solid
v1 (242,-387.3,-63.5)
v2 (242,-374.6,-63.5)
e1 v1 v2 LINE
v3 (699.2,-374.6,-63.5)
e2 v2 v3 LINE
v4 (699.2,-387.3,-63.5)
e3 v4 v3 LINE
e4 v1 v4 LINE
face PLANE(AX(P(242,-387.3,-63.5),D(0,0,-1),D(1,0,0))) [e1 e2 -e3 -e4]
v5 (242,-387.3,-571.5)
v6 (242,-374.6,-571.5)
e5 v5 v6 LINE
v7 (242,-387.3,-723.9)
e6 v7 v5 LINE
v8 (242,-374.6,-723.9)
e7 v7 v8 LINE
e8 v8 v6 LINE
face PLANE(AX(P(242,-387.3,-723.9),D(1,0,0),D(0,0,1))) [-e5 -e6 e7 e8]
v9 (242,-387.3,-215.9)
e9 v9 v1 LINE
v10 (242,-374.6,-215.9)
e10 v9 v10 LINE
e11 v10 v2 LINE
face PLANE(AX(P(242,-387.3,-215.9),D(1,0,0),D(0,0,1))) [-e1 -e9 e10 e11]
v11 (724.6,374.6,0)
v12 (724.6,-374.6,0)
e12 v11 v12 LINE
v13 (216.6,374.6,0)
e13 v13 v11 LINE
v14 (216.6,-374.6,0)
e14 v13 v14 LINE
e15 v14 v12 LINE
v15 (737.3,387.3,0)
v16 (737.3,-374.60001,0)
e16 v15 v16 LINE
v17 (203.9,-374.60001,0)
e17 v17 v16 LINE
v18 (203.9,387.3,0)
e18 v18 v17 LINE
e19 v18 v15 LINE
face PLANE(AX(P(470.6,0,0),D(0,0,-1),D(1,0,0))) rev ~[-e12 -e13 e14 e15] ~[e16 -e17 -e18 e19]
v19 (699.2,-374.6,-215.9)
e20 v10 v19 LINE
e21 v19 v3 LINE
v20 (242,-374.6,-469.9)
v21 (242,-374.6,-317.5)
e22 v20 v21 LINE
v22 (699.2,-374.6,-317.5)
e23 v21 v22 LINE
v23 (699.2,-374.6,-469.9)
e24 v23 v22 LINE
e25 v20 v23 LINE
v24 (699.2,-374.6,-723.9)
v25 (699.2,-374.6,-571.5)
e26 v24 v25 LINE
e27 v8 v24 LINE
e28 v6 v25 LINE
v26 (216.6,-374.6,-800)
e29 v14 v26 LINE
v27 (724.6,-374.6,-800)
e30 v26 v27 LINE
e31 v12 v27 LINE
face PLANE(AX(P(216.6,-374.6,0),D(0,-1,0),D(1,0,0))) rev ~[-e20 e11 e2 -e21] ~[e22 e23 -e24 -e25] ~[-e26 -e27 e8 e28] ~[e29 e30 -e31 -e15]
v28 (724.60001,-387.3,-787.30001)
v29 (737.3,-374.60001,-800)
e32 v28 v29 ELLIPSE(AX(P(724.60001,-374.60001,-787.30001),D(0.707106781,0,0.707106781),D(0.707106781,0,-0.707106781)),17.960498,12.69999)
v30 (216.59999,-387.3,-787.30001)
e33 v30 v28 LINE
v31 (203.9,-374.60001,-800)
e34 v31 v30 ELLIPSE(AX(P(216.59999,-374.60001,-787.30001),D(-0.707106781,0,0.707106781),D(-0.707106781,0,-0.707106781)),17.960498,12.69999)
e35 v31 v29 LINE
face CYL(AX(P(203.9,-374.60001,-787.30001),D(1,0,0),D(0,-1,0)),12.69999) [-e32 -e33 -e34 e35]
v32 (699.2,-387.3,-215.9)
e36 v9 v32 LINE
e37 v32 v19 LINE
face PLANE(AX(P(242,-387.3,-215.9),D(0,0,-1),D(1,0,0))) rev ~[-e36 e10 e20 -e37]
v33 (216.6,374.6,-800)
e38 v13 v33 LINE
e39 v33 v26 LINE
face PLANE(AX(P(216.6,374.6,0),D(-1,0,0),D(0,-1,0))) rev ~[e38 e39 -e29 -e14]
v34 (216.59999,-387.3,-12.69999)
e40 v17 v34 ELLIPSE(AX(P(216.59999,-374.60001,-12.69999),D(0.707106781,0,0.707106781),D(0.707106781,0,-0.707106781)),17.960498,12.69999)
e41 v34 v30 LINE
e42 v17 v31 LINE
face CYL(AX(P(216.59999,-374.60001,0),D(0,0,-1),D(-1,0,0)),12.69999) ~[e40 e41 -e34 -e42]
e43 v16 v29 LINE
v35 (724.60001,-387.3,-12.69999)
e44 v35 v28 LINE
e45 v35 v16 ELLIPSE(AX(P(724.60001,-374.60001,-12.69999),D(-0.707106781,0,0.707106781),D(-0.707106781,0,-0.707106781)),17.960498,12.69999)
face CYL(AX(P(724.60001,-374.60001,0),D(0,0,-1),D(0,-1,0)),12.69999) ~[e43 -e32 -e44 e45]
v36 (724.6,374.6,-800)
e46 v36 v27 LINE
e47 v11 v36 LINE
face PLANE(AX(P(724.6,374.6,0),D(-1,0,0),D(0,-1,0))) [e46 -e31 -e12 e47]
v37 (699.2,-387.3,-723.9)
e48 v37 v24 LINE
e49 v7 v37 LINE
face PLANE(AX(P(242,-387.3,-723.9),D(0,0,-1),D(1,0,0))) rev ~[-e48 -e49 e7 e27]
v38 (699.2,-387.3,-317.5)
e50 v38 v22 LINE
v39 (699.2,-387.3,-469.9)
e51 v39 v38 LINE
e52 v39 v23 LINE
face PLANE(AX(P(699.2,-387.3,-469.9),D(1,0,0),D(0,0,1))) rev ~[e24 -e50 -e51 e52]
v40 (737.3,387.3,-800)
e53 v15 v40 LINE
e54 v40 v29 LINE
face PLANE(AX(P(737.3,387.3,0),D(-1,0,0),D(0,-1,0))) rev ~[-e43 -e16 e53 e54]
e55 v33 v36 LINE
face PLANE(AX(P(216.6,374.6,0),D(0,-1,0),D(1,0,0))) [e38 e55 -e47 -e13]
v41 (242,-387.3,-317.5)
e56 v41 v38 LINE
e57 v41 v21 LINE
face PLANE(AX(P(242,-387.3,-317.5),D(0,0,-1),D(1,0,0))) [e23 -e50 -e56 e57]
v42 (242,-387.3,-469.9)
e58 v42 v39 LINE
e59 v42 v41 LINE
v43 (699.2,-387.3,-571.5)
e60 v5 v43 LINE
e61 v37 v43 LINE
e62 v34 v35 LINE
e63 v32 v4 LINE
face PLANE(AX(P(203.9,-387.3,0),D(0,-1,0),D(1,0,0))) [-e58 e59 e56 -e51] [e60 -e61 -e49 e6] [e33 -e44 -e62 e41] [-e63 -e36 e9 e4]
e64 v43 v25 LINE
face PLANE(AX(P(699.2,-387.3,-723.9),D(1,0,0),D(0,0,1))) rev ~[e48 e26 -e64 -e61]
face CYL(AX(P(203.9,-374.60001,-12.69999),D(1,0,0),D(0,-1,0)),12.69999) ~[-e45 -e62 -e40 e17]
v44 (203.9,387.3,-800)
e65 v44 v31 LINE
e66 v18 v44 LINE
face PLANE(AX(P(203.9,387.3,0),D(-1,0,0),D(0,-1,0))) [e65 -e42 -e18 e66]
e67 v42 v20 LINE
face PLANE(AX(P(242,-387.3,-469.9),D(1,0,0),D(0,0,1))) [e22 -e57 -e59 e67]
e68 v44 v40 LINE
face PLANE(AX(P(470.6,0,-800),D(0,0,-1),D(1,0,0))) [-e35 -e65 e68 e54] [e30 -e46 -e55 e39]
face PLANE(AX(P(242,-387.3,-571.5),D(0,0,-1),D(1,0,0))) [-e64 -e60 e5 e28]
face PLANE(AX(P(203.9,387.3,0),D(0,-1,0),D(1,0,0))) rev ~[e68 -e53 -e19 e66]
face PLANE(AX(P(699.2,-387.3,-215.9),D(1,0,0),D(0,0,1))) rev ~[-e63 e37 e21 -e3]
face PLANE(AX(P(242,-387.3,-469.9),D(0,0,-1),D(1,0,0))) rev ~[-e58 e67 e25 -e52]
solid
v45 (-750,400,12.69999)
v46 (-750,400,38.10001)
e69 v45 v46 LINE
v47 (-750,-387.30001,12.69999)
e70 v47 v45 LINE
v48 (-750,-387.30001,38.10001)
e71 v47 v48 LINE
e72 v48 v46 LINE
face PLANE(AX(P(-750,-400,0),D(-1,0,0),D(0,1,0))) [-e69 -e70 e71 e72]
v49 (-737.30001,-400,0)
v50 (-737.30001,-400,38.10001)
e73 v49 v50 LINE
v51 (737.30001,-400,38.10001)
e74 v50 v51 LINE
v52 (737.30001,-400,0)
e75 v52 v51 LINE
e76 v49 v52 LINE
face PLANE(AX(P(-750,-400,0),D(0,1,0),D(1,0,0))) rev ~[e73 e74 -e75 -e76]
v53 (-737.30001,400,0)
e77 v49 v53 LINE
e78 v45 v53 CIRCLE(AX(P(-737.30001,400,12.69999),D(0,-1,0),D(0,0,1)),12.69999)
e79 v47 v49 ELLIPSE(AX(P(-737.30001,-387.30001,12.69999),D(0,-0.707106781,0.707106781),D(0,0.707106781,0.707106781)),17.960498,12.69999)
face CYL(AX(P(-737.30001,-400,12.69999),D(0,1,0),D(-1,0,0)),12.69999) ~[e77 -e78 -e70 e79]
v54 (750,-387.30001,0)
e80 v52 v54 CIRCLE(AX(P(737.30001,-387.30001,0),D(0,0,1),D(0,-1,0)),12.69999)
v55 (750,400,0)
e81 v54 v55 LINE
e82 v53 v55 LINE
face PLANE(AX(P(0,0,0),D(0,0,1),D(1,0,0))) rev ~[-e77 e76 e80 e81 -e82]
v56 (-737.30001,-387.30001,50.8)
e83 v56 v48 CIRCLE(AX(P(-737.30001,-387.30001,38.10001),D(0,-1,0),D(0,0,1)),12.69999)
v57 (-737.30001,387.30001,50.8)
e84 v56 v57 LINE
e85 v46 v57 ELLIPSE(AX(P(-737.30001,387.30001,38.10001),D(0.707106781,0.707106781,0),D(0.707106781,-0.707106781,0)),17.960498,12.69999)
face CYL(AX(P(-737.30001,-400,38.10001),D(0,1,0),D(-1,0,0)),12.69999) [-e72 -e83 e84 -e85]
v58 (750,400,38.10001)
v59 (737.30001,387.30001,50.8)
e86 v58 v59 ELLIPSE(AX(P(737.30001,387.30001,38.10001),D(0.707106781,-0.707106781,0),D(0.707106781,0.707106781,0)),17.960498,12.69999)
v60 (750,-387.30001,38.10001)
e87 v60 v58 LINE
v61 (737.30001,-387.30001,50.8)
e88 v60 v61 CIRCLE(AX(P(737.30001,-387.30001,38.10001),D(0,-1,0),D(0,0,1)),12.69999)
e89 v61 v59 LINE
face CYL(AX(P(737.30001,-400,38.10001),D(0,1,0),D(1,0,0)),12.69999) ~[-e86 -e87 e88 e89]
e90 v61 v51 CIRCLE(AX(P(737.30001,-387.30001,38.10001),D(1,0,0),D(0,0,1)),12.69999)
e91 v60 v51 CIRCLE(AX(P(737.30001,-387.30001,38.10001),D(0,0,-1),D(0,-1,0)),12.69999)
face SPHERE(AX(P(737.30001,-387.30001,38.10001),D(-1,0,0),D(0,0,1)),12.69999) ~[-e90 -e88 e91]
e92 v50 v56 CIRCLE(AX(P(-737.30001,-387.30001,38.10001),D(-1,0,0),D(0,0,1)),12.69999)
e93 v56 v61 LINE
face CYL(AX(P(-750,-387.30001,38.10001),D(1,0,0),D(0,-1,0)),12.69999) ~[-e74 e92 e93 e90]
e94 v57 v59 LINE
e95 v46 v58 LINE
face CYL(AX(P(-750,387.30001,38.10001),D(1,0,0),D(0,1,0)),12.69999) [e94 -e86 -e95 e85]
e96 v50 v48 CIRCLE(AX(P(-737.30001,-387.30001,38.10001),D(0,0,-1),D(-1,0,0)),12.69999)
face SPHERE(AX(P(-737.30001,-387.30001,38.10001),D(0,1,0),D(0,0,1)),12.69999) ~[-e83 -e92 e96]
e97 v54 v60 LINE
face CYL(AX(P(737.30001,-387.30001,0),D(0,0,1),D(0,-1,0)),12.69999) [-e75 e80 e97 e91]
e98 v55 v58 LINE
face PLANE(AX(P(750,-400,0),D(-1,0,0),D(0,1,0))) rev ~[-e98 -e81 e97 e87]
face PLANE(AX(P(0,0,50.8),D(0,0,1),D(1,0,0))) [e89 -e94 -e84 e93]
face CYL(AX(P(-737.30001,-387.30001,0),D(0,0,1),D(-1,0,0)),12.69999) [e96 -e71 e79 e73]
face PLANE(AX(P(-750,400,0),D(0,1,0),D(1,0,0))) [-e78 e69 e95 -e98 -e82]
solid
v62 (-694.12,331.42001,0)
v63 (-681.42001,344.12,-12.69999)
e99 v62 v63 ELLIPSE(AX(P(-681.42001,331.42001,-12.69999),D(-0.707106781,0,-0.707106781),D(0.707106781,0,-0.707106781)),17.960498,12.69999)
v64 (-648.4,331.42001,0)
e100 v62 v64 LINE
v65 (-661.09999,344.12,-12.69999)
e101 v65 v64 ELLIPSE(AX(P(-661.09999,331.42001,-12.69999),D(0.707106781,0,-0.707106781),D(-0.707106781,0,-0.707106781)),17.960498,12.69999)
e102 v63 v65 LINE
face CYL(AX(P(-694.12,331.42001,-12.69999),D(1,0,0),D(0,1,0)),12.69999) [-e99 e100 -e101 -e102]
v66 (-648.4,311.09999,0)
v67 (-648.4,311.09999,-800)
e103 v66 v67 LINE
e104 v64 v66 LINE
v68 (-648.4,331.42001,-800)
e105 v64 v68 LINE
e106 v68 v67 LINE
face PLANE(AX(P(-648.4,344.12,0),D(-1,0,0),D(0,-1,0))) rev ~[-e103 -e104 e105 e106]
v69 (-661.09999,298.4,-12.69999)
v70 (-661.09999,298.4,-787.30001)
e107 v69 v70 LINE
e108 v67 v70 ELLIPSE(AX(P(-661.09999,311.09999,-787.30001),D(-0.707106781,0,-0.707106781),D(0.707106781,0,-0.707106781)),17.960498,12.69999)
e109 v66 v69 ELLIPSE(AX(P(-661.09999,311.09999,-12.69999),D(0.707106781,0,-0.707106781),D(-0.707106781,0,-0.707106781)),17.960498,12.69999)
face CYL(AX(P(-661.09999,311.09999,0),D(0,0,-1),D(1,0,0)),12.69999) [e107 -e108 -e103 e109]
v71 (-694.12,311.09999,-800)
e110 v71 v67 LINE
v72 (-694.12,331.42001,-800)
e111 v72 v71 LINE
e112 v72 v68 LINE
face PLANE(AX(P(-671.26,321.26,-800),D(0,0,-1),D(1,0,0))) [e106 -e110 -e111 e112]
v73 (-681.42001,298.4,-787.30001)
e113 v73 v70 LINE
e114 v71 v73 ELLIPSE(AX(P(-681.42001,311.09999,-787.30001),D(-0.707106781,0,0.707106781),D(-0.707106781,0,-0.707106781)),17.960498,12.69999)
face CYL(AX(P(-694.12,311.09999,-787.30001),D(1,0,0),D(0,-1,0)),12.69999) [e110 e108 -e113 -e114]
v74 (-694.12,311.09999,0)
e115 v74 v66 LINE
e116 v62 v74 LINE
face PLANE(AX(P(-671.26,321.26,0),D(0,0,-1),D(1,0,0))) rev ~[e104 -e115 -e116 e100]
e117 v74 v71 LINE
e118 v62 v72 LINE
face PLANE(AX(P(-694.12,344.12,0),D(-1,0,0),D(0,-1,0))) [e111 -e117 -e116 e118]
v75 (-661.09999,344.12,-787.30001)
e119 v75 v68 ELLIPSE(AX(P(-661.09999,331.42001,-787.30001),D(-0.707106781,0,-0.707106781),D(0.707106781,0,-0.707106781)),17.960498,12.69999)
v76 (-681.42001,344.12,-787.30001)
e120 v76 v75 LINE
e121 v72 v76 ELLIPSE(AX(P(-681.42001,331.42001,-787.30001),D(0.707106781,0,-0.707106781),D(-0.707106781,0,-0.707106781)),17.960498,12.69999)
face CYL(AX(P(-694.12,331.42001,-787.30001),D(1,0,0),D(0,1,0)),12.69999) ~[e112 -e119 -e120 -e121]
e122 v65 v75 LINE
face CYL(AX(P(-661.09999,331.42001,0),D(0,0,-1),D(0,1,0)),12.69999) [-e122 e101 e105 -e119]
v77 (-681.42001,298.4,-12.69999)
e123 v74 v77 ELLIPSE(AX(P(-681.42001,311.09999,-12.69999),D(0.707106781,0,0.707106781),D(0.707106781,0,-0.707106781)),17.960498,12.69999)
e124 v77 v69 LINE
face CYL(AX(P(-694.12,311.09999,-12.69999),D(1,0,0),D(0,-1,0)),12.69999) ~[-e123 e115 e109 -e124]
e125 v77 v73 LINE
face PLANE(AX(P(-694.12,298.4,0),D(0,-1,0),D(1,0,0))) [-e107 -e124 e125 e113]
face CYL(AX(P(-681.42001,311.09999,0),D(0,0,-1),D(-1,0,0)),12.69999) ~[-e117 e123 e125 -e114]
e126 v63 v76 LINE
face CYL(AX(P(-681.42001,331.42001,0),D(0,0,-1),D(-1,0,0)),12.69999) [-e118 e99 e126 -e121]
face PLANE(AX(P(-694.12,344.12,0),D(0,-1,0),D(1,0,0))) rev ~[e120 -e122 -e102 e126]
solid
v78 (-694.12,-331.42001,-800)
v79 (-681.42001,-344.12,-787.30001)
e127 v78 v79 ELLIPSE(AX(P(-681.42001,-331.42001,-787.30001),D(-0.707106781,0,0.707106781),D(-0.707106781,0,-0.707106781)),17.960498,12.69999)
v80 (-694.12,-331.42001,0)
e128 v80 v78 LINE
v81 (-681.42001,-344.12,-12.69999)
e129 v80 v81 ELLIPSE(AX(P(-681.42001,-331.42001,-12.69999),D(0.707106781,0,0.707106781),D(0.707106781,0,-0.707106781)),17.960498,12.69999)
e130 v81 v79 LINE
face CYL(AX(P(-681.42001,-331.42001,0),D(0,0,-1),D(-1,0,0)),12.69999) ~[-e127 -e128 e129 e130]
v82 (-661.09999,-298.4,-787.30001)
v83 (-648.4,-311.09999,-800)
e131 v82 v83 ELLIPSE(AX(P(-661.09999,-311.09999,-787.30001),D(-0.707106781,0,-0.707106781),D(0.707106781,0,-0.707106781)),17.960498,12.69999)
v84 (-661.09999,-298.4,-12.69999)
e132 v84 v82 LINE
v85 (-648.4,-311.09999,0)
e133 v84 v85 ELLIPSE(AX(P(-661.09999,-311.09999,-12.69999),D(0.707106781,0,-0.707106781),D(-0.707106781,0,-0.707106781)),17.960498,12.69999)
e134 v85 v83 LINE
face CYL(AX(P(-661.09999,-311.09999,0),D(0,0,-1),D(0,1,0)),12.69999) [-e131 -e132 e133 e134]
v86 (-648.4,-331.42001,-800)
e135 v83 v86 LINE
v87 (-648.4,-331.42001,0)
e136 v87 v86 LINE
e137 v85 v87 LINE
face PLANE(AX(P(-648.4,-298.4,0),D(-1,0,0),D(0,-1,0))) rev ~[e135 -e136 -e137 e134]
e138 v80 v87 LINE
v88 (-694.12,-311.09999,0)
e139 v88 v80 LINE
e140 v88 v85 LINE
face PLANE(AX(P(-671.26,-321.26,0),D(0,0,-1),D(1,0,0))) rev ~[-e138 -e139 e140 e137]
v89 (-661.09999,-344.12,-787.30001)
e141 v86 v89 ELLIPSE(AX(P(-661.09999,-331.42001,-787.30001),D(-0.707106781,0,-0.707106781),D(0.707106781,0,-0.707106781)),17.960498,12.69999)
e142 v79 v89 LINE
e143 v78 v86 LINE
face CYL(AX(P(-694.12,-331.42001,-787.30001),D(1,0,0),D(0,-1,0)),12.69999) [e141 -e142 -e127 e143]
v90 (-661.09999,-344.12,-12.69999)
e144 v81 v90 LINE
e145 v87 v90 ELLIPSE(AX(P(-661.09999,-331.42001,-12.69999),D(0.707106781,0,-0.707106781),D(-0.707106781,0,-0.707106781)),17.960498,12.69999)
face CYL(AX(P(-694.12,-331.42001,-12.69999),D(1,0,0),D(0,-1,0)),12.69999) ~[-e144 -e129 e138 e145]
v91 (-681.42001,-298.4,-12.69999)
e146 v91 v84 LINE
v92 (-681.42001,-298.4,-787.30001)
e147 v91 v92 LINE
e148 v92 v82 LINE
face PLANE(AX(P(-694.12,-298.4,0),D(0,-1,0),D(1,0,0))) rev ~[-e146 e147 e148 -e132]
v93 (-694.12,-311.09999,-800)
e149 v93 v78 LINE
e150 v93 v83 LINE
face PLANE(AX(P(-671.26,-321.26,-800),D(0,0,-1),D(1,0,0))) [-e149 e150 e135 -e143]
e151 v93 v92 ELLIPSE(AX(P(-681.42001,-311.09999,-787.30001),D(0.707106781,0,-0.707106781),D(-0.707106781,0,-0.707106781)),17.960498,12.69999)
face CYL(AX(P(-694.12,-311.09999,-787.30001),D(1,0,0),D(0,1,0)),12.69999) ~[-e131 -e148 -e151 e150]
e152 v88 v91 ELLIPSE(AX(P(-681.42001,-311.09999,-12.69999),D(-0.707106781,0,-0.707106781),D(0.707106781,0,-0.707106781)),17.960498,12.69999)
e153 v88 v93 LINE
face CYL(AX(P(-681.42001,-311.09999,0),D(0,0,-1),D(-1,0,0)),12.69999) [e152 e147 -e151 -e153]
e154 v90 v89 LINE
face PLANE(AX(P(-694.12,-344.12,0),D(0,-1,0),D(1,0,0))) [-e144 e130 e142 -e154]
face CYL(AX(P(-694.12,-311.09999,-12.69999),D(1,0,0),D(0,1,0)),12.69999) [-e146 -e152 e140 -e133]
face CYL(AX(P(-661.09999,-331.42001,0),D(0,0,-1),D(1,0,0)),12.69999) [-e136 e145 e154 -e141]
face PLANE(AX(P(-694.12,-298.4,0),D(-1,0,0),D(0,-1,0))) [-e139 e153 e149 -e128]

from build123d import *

# Parameters (mm, degrees)
F0_W     = 1500
F0_H     = 800
F1_DEPTH = 50.8
F2_W     = 45.72
F2_H     = 45.72
F3_DEPTH = 800
F4_W     = 533.4
F4_H     = 774.6
F4_W_2   = 508
F4_H_2   = 749.2
F5_DEPTH = 800
F6_R     = 12.69999
F6_2_R   = 12.69999
F6_3_R   = 12.69999
F6_4_R   = 12.69999
F7_W     = 457.2
F7_H     = 152.4
F8_DEPTH = 25.4


# Not quite as in the source:
# - a fillet or chamfer is up to 0.001 mm smaller than in the source, because OpenCascade refuses the exact size


with BuildPart() as f1:
    # F0 (on Top) → F1 (new body)
    with BuildSketch(Plane.XY):
        Rectangle(F0_W, F0_H)
    extrude(amount=F1_DEPTH)

    # F6#2 (radius 12.7 in the source; OpenCascade refuses exactly that, so slightly less here)
    f6_2_edges = [f1.edges().sort_by_distance(p)[0] for p in [
        (0, 400, 50.8),
        (-750, 0, 50.8),
        (0, -400, 50.8),
        (750, 0, 50.8),
        (-750, 0, 0),
        (-750, -400, 25.4),
        (750, -400, 25.4),
    ]]
    fillet(f6_2_edges, radius=F6_2_R)


with BuildPart() as f3:
    # F2 (on face) → F3 (new body)
    with BuildSketch(Plane(origin=(0, 0, 0), x_dir=(1, 0, 0), z_dir=(0, 0, -1))):
        with Locations((-671.26, 321.26)):
            Rectangle(F2_W, F2_H)
    extrude(amount=F3_DEPTH)

    # F6#3 (radius 12.7 in the source; OpenCascade refuses exactly that, so slightly less here)
    f6_3_edges = [f3.edges().sort_by_distance(p)[0] for p in [
        (-648.4, -344.12, -400),
        (-694.12, -344.12, -400),
        (-671.26, -344.12, 0),
        (-671.26, -344.12, -800),
        (-694.12, -298.4, -400),
        (-648.4, -298.4, -400),
        (-671.26, -298.4, 0),
        (-671.26, -298.4, -800),
    ]]
    fillet(f6_3_edges, radius=F6_3_R)


with BuildPart() as f3b:
    # F2 (on face) → F3, piece 2 (new body)
    with BuildSketch(Plane(origin=(0, 0, 0), x_dir=(1, 0, 0), z_dir=(0, 0, -1))):
        with Locations((-671.26, -321.26)):
            Rectangle(F2_W, F2_H)
    extrude(amount=F3_DEPTH)

    # F6#4 (radius 12.7 in the source; OpenCascade refuses exactly that, so slightly less here)
    f6_4_edges = [f3b.edges().sort_by_distance(p)[0] for p in [
        (-648.4, 298.4, -400),
        (-694.12, 298.4, -400),
        (-671.26, 298.4, 0),
        (-671.26, 298.4, -800),
        (-694.12, 344.12, -400),
        (-648.4, 344.12, -400),
        (-671.26, 344.12, 0),
        (-671.26, 344.12, -800),
    ]]
    fillet(f6_4_edges, radius=F6_4_R)


with BuildPart() as f5:
    # F4 (on face) → F5 (new body)
    with BuildSketch(Plane(origin=(0, 0, 0), x_dir=(1, 0, 0), z_dir=(0, 0, -1))):
        with Locations((470.6, 0)):
            Rectangle(F4_W, F4_H)
        with Locations((470.6, 0)):
            Rectangle(F4_W_2, F4_H_2, mode=Mode.SUBTRACT)
    extrude(amount=F5_DEPTH)

    # F6 (radius 12.7 in the source; OpenCascade refuses exactly that, so slightly less here)
    f6_edges = [f5.edges().sort_by_distance(p)[0] for p in [
        (737.3, -387.3, -400),
        (203.9, -387.3, -400),
        (470.6, -387.3, 0),
        (470.6, -387.3, -800),
    ]]
    fillet(f6_edges, radius=F6_R)

    # F7 (on face) → F8 (cut)
    with BuildSketch(Plane.XZ.offset(387.3)):
        with Locations((470.6, -139.7)):
            Rectangle(F7_W, F7_H)
        with Locations((470.6, -393.7)):
            Rectangle(F7_W, F7_H)
        with Locations((470.6, -647.7)):
            Rectangle(F7_W, F7_H)
    extrude(amount=-F8_DEPTH, mode=Mode.SUBTRACT)


solid = Compound([f1.part, f3.part, f3b.part, f5.part])
